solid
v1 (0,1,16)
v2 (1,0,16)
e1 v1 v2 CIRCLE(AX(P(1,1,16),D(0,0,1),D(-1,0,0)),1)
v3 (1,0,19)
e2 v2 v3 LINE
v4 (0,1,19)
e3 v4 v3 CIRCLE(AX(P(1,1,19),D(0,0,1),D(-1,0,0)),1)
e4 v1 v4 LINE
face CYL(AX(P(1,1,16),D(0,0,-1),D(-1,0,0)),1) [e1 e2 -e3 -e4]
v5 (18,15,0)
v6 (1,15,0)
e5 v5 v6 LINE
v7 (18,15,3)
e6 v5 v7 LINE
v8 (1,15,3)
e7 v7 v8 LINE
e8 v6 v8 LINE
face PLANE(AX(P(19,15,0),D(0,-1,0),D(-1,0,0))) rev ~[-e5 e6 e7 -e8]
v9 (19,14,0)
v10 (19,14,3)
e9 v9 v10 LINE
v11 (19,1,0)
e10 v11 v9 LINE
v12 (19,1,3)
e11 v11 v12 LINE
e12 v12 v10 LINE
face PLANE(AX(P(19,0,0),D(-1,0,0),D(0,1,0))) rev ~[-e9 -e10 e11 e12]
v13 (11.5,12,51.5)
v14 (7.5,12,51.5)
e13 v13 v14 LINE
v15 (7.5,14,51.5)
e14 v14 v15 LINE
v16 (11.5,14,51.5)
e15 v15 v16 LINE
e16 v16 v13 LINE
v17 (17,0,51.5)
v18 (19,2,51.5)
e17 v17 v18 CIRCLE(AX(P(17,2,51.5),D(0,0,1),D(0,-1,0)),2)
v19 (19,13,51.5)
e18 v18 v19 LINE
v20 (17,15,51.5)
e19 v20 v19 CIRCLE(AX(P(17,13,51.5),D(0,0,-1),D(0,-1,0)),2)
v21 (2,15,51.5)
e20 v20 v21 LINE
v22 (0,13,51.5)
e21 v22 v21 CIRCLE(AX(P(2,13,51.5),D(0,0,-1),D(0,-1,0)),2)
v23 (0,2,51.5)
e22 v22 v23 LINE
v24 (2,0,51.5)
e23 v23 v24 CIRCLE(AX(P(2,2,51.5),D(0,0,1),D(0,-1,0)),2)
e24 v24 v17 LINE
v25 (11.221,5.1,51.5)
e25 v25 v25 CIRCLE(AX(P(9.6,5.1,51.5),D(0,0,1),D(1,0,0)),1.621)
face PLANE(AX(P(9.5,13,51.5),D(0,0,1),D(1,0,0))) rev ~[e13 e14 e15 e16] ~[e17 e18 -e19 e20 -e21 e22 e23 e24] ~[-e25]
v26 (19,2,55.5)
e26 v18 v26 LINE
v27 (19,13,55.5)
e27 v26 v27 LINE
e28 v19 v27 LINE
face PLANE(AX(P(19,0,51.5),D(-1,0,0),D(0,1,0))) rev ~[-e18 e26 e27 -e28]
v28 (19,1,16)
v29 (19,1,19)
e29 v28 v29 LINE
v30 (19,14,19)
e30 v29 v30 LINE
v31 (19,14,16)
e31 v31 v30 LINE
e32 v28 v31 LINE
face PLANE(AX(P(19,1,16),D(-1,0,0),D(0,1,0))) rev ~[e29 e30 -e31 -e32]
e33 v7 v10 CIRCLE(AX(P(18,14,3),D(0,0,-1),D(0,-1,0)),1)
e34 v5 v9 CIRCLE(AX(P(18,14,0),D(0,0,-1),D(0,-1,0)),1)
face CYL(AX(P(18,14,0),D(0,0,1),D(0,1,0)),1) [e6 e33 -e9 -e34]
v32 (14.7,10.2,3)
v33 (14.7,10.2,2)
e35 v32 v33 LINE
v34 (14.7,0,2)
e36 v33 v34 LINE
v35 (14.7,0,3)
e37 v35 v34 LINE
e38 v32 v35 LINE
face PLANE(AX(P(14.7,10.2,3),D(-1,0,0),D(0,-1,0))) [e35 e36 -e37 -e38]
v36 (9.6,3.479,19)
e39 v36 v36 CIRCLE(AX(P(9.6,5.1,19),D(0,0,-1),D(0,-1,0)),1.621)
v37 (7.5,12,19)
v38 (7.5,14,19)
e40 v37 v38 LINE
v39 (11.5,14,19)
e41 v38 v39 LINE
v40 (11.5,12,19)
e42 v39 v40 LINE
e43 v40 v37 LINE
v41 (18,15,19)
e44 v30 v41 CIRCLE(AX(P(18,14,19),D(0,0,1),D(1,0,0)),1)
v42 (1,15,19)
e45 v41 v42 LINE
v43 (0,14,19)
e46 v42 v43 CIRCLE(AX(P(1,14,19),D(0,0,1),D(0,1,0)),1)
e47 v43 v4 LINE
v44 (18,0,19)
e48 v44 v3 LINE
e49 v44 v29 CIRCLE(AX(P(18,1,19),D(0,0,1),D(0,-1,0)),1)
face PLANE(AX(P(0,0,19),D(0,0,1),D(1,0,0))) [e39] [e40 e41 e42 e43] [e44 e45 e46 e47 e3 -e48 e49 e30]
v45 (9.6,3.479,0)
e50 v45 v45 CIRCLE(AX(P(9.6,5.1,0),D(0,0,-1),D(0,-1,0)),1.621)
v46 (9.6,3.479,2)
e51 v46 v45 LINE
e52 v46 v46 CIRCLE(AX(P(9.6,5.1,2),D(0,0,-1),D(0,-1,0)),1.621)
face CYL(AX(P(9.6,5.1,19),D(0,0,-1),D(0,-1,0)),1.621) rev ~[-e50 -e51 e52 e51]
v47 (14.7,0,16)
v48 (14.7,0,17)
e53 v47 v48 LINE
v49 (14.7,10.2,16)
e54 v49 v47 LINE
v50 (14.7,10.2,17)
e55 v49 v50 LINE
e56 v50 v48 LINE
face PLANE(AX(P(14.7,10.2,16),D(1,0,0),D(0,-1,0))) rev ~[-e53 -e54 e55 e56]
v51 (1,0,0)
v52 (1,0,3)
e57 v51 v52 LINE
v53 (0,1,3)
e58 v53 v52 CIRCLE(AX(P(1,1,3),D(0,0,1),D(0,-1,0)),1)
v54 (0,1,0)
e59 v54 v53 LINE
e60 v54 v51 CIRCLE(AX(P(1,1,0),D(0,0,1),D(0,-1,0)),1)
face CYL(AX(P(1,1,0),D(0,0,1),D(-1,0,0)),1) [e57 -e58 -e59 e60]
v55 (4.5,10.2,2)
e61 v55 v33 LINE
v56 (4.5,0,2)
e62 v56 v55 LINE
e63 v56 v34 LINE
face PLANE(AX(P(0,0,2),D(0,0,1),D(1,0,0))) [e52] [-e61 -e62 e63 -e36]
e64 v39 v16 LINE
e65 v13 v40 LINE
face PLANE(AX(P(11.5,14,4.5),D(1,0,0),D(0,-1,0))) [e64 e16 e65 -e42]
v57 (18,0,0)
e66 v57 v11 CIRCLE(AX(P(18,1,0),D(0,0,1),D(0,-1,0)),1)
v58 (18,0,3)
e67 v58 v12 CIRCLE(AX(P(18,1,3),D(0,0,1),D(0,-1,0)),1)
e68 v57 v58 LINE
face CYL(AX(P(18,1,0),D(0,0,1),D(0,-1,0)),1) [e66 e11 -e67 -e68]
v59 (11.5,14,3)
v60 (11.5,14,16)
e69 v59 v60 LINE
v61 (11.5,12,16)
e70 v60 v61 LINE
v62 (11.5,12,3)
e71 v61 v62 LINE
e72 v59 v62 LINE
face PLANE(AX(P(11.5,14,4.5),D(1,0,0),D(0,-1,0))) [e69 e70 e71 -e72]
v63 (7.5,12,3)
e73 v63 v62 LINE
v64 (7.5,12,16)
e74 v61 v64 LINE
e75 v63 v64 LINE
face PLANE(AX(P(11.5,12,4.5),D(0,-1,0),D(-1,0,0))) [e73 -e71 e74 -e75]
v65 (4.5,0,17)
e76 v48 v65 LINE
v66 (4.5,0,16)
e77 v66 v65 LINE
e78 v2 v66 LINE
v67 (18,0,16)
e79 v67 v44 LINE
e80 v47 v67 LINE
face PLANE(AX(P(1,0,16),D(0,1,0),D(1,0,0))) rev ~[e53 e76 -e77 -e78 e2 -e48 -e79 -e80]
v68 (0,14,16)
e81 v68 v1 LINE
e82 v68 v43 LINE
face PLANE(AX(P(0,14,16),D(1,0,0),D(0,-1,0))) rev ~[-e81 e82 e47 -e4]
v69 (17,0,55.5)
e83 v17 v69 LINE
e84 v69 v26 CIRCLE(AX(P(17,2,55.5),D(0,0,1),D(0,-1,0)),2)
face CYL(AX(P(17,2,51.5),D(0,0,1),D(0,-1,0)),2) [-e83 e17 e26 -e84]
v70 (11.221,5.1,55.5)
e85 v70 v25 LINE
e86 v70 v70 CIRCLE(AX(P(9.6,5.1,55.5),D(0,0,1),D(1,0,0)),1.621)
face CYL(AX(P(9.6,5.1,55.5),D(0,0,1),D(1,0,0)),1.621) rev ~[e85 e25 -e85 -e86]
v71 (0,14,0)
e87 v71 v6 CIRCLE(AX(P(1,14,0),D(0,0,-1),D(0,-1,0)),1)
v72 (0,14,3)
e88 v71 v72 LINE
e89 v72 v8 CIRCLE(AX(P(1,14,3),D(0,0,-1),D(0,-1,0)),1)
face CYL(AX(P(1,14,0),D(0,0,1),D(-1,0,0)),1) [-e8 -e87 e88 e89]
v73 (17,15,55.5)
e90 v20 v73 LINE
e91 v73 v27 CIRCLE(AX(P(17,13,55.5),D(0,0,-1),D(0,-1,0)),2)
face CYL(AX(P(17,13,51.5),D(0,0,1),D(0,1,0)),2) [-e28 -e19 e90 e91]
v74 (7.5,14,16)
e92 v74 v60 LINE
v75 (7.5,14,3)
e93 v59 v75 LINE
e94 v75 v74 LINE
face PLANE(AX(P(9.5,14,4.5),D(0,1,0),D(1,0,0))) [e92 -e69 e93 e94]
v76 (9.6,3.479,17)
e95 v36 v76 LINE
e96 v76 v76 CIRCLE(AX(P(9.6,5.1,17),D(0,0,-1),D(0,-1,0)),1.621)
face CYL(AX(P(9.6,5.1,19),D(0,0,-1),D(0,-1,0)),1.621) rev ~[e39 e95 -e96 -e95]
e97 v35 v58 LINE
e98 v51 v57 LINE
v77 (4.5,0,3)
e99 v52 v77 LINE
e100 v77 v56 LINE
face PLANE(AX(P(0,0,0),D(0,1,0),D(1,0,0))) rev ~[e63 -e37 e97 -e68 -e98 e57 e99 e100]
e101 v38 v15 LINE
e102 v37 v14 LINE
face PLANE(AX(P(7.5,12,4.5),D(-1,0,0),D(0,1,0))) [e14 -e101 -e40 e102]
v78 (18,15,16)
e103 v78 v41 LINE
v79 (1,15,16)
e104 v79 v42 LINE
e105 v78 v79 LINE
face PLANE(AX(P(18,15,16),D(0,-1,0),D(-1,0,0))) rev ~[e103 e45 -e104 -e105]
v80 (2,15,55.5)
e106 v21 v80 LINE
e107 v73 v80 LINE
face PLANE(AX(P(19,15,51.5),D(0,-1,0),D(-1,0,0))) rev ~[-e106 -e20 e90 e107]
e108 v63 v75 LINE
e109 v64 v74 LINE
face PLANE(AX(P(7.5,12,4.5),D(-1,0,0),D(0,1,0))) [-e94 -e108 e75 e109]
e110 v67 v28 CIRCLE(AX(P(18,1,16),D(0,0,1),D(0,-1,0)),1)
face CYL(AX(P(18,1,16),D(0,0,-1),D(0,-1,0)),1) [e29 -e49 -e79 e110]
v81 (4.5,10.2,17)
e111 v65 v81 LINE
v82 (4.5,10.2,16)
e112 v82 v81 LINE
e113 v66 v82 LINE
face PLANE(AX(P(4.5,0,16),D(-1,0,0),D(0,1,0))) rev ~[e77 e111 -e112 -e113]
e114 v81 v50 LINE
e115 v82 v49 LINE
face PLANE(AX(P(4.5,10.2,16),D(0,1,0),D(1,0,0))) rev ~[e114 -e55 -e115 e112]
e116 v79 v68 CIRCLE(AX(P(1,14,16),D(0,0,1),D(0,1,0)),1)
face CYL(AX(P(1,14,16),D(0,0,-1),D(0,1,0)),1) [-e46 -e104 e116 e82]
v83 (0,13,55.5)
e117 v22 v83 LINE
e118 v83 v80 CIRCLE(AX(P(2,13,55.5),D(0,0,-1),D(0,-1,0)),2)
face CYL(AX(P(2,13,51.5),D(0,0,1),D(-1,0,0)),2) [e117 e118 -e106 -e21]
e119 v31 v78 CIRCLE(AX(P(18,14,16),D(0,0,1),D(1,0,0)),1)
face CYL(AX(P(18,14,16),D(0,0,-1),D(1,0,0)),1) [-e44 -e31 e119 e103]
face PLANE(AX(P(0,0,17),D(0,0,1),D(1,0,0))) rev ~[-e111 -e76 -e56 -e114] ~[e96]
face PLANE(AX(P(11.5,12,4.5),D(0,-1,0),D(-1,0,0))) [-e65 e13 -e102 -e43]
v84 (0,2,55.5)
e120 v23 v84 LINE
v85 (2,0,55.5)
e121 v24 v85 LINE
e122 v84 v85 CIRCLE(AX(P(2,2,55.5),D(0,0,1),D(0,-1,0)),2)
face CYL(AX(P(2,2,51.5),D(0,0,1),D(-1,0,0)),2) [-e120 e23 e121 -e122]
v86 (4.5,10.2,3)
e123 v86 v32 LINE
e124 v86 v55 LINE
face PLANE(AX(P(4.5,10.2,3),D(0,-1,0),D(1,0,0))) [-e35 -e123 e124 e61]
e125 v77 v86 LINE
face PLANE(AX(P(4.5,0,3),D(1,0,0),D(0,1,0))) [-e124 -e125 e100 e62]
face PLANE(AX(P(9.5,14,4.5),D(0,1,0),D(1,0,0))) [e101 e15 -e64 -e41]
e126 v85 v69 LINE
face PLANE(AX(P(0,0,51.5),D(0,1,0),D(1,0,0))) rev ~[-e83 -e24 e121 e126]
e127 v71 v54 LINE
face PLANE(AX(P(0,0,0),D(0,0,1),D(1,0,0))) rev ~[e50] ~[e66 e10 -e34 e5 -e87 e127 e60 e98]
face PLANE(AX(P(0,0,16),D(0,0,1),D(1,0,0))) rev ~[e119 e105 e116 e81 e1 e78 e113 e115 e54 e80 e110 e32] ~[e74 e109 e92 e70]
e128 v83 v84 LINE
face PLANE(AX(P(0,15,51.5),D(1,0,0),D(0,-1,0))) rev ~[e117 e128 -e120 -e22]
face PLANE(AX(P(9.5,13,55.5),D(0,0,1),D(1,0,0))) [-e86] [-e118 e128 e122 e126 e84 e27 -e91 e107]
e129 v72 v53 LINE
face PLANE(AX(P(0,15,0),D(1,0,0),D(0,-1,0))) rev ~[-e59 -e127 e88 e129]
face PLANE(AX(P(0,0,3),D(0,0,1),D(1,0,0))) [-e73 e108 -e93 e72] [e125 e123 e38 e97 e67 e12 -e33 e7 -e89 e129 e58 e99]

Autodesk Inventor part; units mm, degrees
ref_plane "YZ Plane" through (0, 0, 0) normal (1, 0, 0) x (0, 1, 0)
ref_plane "XZ Plane" through (0, 0, 0) normal (0, 1, 0) x (-1, 0, 0)
ref_plane "XY Plane" through (0, 0, 0) normal (0, 0, 1) x (1, 0, 0)
sketch "Sketch1" plane through (0, 0, 0) normal (0, 0, 1) x (1, 0, 0)
  line L0 (0, 0) -> (19, 0)
  line L1 (19, 0) -> (19, 15)
  line L2 (19, 15) -> (0, 15)
  line L3 (0, 15) -> (0, 0)
  point P0 (9.5, 15)
  dimension "d0" = 19
  dimension "d1" = 15
extrude "Extrusion1" add sketch "Sketch1" along normal blind 3
sketch "Sketch2" plane through (0, 0, 3) normal (0, 0, 1) x (1, 0, 0)
  line L0 (19, 15) -> (0, 15) projected
  circle A0 centre (9.5, 13) radius 1
  point P0 (0, 0)
  point P1 (9.5, 15)
  dimension "d4" = 2
  dimension "d5" = 2
extrude "Extrusion2" add sketch "Sketch2" along normal blind 1.5
sketch "Sketch6" plane through (9.5, 13, 4.5) normal (0, 0, 1) x (1, 0, 0)
  circle A0 centre (0, 0) radius 1 projected
  line L0 (2, -1) -> (-2, -1)
  line L1 (-2, -1) -> (-2, 1)
  line L2 (-2, 1) -> (2, 1)
  line L3 (2, 1) -> (2, -1)
  line L4 (2, -1) -> (-2, 1) construction
  line L5 (-2, -1) -> (2, 1) construction
  point P0 (-9.5, -13)
  dimension "d13" = 4
extrude "Extrusion5" add sketch "Sketch6" along normal blind 47
sketch "Sketch7" plane through (9.5, 13, 51.5) normal (0, 0, 1) x (1, 0, 0)
  circle A0 centre (0, 0) radius 1 projected
  line L0 (-9.5, -13) -> (9.5, -13) projected
  line L1 (9.5, -13) -> (9.5, 2) projected
  line L2 (9.5, 2) -> (-9.5, 2) projected
  line L3 (-9.5, 2) -> (-9.5, -13) projected
  arc A1 (0, -1) -> (0, 1) centre (0, 0) ccw projected
  arc A2 (0, 1) -> (0, -1) centre (0, 0) ccw projected
extrude "Extrusion6" add sketch "Sketch7" along normal blind 4 contours A0 | L3 L2 L1 L0
fillet "Fillet2" radius 1 4 edges at (19, 0, 1.5) (19, 15, 1.5) (0, 0, 1.5) (0, 15, 1.5)
fillet "Fillet3" radius 2 4 edges at (19, 0, 53.5) (19, 15, 53.5) (0, 0, 53.5) (0, 15, 53.5)
extrude "Extrusion10" add sketch "Sketch6" against normal up to surface (1.5 mm away) contours A0 L2 L3 L0 | A0 L0 L1 L2
sketch "Sketch13" plane through (0, 0, 3) normal (0, 0, 1) x (1, 0, 0)
  line L0 (11.5, 12) -> (7.5, 12) projected
  line L1 (7.5, 12) -> (7.5, 14) projected
  line L2 (7.5, 14) -> (11.5, 14) projected
  line L3 (11.5, 14) -> (11.5, 12) projected
  arc A0 (1, 15) -> (0, 14) centre (1, 14) ccw projected
  line L4 (0, 14) -> (0, 1) projected
  arc A1 (0, 1) -> (1, 0) centre (1, 1) ccw projected
  line L5 (1, 0) -> (18, 0) projected
  arc A2 (18, 0) -> (19, 1) centre (18, 1) ccw projected
  line L6 (19, 1) -> (19, 14) projected
  arc A3 (19, 14) -> (18, 15) centre (18, 14) ccw projected
  line L7 (18, 15) -> (1, 15) projected
  line L8 (4.5, 10.2) -> (14.7, 10.2)
  line L9 (14.7, 10.2) -> (14.7, 0)
  line L10 (14.7, 0) -> (4.5, 0)
  line L11 (4.5, 0) -> (4.5, 10.2)
  point P0 (0, 0)
  point P1 (14.7, 0)
  dimension "d67" = 10.2
  dimension "d68" = 10.2
  dimension "d69" = 4.5
extrude "Extrusion12" cut sketch "Sketch13" against normal blind 1 contours L11 L8 L9 L5
ref_plane "Work Plane1" through (0, 0, 16) normal (0, 0, 1) x (1, 0, 0)
sketch "Sketch14" plane through (0, 0, 16) normal (0, 0, 1) x (1, 0, 0)
  line L0 (4.5, 0) -> (4.5, 10.2) projected
  line L1 (4.5, 10.2) -> (14.7, 10.2) projected
  line L2 (14.7, 10.2) -> (14.7, 0) projected
  line L3 (14.7, 0) -> (18, 0) projected
  arc A0 (18, 0) -> (19, 1) centre (18, 1) ccw projected
  line L4 (19, 1) -> (19, 14) projected
  arc A1 (19, 14) -> (18, 15) centre (18, 14) ccw projected
  line L5 (18, 15) -> (1, 15) projected
  arc A2 (1, 15) -> (0, 14) centre (1, 14) ccw projected
  line L6 (0, 14) -> (0, 1) projected
  arc A3 (0, 1) -> (1, 0) centre (1, 1) ccw projected
  line L7 (1, 0) -> (4.5, 0) projected
  line L8 (11.5, 12) -> (7.5, 12) projected
  line L9 (7.5, 12) -> (7.5, 14) projected
  line L10 (7.5, 14) -> (11.5, 14) projected
  line L11 (11.5, 14) -> (11.5, 12) projected
  line L12 (4.5, 0) -> (4.5, 10.2) projected
  line L13 (14.7, 0) -> (4.5, 0) projected
  line L14 (14.7, 10.2) -> (14.7, 0) projected
  line L15 (4.5, 10.2) -> (14.7, 10.2) projected
  point P0 (0, 0)
extrude "Extrusion13" add sketch "Sketch14" along normal blind 3
sketch "Sketch15" plane through (0, 0, 19) normal (0, 0, 1) x (1, 0, 0)
  line L0 (4.5, 0) -> (4.5, 10.2) projected
  line L1 (14.7, 0) -> (4.5, 0) projected
  line L2 (14.7, 10.2) -> (14.7, 0) projected
  line L3 (4.5, 10.2) -> (14.7, 10.2) projected
  point P0 (0, 0)
  point P1 (9.6, 5.1)
hole "Hole1" at (9.6, 5.1, 19) direction (0, 0, -1) diameter 3.242 end through all thread size "M4x0.7" class "6H" standard "ISO Metric profile"
extrude "Extrusion14" cut sketch "Sketch14" along normal blind 1 contours L0 L1 L2 L13
sketch "Sketch16" plane through (9.5, 13, 55.5) normal (0, 0, 1) x (1, 0, 0)
  circle A0 centre (0.1, -7.9) radius 1.621 projected
  point P0 (-9.5, -13)
extrude "Extrusion15" cut sketch "Sketch16" against normal up to surface (4 mm away)
properties part number "Crystal-Cut10x10-screwM4"
